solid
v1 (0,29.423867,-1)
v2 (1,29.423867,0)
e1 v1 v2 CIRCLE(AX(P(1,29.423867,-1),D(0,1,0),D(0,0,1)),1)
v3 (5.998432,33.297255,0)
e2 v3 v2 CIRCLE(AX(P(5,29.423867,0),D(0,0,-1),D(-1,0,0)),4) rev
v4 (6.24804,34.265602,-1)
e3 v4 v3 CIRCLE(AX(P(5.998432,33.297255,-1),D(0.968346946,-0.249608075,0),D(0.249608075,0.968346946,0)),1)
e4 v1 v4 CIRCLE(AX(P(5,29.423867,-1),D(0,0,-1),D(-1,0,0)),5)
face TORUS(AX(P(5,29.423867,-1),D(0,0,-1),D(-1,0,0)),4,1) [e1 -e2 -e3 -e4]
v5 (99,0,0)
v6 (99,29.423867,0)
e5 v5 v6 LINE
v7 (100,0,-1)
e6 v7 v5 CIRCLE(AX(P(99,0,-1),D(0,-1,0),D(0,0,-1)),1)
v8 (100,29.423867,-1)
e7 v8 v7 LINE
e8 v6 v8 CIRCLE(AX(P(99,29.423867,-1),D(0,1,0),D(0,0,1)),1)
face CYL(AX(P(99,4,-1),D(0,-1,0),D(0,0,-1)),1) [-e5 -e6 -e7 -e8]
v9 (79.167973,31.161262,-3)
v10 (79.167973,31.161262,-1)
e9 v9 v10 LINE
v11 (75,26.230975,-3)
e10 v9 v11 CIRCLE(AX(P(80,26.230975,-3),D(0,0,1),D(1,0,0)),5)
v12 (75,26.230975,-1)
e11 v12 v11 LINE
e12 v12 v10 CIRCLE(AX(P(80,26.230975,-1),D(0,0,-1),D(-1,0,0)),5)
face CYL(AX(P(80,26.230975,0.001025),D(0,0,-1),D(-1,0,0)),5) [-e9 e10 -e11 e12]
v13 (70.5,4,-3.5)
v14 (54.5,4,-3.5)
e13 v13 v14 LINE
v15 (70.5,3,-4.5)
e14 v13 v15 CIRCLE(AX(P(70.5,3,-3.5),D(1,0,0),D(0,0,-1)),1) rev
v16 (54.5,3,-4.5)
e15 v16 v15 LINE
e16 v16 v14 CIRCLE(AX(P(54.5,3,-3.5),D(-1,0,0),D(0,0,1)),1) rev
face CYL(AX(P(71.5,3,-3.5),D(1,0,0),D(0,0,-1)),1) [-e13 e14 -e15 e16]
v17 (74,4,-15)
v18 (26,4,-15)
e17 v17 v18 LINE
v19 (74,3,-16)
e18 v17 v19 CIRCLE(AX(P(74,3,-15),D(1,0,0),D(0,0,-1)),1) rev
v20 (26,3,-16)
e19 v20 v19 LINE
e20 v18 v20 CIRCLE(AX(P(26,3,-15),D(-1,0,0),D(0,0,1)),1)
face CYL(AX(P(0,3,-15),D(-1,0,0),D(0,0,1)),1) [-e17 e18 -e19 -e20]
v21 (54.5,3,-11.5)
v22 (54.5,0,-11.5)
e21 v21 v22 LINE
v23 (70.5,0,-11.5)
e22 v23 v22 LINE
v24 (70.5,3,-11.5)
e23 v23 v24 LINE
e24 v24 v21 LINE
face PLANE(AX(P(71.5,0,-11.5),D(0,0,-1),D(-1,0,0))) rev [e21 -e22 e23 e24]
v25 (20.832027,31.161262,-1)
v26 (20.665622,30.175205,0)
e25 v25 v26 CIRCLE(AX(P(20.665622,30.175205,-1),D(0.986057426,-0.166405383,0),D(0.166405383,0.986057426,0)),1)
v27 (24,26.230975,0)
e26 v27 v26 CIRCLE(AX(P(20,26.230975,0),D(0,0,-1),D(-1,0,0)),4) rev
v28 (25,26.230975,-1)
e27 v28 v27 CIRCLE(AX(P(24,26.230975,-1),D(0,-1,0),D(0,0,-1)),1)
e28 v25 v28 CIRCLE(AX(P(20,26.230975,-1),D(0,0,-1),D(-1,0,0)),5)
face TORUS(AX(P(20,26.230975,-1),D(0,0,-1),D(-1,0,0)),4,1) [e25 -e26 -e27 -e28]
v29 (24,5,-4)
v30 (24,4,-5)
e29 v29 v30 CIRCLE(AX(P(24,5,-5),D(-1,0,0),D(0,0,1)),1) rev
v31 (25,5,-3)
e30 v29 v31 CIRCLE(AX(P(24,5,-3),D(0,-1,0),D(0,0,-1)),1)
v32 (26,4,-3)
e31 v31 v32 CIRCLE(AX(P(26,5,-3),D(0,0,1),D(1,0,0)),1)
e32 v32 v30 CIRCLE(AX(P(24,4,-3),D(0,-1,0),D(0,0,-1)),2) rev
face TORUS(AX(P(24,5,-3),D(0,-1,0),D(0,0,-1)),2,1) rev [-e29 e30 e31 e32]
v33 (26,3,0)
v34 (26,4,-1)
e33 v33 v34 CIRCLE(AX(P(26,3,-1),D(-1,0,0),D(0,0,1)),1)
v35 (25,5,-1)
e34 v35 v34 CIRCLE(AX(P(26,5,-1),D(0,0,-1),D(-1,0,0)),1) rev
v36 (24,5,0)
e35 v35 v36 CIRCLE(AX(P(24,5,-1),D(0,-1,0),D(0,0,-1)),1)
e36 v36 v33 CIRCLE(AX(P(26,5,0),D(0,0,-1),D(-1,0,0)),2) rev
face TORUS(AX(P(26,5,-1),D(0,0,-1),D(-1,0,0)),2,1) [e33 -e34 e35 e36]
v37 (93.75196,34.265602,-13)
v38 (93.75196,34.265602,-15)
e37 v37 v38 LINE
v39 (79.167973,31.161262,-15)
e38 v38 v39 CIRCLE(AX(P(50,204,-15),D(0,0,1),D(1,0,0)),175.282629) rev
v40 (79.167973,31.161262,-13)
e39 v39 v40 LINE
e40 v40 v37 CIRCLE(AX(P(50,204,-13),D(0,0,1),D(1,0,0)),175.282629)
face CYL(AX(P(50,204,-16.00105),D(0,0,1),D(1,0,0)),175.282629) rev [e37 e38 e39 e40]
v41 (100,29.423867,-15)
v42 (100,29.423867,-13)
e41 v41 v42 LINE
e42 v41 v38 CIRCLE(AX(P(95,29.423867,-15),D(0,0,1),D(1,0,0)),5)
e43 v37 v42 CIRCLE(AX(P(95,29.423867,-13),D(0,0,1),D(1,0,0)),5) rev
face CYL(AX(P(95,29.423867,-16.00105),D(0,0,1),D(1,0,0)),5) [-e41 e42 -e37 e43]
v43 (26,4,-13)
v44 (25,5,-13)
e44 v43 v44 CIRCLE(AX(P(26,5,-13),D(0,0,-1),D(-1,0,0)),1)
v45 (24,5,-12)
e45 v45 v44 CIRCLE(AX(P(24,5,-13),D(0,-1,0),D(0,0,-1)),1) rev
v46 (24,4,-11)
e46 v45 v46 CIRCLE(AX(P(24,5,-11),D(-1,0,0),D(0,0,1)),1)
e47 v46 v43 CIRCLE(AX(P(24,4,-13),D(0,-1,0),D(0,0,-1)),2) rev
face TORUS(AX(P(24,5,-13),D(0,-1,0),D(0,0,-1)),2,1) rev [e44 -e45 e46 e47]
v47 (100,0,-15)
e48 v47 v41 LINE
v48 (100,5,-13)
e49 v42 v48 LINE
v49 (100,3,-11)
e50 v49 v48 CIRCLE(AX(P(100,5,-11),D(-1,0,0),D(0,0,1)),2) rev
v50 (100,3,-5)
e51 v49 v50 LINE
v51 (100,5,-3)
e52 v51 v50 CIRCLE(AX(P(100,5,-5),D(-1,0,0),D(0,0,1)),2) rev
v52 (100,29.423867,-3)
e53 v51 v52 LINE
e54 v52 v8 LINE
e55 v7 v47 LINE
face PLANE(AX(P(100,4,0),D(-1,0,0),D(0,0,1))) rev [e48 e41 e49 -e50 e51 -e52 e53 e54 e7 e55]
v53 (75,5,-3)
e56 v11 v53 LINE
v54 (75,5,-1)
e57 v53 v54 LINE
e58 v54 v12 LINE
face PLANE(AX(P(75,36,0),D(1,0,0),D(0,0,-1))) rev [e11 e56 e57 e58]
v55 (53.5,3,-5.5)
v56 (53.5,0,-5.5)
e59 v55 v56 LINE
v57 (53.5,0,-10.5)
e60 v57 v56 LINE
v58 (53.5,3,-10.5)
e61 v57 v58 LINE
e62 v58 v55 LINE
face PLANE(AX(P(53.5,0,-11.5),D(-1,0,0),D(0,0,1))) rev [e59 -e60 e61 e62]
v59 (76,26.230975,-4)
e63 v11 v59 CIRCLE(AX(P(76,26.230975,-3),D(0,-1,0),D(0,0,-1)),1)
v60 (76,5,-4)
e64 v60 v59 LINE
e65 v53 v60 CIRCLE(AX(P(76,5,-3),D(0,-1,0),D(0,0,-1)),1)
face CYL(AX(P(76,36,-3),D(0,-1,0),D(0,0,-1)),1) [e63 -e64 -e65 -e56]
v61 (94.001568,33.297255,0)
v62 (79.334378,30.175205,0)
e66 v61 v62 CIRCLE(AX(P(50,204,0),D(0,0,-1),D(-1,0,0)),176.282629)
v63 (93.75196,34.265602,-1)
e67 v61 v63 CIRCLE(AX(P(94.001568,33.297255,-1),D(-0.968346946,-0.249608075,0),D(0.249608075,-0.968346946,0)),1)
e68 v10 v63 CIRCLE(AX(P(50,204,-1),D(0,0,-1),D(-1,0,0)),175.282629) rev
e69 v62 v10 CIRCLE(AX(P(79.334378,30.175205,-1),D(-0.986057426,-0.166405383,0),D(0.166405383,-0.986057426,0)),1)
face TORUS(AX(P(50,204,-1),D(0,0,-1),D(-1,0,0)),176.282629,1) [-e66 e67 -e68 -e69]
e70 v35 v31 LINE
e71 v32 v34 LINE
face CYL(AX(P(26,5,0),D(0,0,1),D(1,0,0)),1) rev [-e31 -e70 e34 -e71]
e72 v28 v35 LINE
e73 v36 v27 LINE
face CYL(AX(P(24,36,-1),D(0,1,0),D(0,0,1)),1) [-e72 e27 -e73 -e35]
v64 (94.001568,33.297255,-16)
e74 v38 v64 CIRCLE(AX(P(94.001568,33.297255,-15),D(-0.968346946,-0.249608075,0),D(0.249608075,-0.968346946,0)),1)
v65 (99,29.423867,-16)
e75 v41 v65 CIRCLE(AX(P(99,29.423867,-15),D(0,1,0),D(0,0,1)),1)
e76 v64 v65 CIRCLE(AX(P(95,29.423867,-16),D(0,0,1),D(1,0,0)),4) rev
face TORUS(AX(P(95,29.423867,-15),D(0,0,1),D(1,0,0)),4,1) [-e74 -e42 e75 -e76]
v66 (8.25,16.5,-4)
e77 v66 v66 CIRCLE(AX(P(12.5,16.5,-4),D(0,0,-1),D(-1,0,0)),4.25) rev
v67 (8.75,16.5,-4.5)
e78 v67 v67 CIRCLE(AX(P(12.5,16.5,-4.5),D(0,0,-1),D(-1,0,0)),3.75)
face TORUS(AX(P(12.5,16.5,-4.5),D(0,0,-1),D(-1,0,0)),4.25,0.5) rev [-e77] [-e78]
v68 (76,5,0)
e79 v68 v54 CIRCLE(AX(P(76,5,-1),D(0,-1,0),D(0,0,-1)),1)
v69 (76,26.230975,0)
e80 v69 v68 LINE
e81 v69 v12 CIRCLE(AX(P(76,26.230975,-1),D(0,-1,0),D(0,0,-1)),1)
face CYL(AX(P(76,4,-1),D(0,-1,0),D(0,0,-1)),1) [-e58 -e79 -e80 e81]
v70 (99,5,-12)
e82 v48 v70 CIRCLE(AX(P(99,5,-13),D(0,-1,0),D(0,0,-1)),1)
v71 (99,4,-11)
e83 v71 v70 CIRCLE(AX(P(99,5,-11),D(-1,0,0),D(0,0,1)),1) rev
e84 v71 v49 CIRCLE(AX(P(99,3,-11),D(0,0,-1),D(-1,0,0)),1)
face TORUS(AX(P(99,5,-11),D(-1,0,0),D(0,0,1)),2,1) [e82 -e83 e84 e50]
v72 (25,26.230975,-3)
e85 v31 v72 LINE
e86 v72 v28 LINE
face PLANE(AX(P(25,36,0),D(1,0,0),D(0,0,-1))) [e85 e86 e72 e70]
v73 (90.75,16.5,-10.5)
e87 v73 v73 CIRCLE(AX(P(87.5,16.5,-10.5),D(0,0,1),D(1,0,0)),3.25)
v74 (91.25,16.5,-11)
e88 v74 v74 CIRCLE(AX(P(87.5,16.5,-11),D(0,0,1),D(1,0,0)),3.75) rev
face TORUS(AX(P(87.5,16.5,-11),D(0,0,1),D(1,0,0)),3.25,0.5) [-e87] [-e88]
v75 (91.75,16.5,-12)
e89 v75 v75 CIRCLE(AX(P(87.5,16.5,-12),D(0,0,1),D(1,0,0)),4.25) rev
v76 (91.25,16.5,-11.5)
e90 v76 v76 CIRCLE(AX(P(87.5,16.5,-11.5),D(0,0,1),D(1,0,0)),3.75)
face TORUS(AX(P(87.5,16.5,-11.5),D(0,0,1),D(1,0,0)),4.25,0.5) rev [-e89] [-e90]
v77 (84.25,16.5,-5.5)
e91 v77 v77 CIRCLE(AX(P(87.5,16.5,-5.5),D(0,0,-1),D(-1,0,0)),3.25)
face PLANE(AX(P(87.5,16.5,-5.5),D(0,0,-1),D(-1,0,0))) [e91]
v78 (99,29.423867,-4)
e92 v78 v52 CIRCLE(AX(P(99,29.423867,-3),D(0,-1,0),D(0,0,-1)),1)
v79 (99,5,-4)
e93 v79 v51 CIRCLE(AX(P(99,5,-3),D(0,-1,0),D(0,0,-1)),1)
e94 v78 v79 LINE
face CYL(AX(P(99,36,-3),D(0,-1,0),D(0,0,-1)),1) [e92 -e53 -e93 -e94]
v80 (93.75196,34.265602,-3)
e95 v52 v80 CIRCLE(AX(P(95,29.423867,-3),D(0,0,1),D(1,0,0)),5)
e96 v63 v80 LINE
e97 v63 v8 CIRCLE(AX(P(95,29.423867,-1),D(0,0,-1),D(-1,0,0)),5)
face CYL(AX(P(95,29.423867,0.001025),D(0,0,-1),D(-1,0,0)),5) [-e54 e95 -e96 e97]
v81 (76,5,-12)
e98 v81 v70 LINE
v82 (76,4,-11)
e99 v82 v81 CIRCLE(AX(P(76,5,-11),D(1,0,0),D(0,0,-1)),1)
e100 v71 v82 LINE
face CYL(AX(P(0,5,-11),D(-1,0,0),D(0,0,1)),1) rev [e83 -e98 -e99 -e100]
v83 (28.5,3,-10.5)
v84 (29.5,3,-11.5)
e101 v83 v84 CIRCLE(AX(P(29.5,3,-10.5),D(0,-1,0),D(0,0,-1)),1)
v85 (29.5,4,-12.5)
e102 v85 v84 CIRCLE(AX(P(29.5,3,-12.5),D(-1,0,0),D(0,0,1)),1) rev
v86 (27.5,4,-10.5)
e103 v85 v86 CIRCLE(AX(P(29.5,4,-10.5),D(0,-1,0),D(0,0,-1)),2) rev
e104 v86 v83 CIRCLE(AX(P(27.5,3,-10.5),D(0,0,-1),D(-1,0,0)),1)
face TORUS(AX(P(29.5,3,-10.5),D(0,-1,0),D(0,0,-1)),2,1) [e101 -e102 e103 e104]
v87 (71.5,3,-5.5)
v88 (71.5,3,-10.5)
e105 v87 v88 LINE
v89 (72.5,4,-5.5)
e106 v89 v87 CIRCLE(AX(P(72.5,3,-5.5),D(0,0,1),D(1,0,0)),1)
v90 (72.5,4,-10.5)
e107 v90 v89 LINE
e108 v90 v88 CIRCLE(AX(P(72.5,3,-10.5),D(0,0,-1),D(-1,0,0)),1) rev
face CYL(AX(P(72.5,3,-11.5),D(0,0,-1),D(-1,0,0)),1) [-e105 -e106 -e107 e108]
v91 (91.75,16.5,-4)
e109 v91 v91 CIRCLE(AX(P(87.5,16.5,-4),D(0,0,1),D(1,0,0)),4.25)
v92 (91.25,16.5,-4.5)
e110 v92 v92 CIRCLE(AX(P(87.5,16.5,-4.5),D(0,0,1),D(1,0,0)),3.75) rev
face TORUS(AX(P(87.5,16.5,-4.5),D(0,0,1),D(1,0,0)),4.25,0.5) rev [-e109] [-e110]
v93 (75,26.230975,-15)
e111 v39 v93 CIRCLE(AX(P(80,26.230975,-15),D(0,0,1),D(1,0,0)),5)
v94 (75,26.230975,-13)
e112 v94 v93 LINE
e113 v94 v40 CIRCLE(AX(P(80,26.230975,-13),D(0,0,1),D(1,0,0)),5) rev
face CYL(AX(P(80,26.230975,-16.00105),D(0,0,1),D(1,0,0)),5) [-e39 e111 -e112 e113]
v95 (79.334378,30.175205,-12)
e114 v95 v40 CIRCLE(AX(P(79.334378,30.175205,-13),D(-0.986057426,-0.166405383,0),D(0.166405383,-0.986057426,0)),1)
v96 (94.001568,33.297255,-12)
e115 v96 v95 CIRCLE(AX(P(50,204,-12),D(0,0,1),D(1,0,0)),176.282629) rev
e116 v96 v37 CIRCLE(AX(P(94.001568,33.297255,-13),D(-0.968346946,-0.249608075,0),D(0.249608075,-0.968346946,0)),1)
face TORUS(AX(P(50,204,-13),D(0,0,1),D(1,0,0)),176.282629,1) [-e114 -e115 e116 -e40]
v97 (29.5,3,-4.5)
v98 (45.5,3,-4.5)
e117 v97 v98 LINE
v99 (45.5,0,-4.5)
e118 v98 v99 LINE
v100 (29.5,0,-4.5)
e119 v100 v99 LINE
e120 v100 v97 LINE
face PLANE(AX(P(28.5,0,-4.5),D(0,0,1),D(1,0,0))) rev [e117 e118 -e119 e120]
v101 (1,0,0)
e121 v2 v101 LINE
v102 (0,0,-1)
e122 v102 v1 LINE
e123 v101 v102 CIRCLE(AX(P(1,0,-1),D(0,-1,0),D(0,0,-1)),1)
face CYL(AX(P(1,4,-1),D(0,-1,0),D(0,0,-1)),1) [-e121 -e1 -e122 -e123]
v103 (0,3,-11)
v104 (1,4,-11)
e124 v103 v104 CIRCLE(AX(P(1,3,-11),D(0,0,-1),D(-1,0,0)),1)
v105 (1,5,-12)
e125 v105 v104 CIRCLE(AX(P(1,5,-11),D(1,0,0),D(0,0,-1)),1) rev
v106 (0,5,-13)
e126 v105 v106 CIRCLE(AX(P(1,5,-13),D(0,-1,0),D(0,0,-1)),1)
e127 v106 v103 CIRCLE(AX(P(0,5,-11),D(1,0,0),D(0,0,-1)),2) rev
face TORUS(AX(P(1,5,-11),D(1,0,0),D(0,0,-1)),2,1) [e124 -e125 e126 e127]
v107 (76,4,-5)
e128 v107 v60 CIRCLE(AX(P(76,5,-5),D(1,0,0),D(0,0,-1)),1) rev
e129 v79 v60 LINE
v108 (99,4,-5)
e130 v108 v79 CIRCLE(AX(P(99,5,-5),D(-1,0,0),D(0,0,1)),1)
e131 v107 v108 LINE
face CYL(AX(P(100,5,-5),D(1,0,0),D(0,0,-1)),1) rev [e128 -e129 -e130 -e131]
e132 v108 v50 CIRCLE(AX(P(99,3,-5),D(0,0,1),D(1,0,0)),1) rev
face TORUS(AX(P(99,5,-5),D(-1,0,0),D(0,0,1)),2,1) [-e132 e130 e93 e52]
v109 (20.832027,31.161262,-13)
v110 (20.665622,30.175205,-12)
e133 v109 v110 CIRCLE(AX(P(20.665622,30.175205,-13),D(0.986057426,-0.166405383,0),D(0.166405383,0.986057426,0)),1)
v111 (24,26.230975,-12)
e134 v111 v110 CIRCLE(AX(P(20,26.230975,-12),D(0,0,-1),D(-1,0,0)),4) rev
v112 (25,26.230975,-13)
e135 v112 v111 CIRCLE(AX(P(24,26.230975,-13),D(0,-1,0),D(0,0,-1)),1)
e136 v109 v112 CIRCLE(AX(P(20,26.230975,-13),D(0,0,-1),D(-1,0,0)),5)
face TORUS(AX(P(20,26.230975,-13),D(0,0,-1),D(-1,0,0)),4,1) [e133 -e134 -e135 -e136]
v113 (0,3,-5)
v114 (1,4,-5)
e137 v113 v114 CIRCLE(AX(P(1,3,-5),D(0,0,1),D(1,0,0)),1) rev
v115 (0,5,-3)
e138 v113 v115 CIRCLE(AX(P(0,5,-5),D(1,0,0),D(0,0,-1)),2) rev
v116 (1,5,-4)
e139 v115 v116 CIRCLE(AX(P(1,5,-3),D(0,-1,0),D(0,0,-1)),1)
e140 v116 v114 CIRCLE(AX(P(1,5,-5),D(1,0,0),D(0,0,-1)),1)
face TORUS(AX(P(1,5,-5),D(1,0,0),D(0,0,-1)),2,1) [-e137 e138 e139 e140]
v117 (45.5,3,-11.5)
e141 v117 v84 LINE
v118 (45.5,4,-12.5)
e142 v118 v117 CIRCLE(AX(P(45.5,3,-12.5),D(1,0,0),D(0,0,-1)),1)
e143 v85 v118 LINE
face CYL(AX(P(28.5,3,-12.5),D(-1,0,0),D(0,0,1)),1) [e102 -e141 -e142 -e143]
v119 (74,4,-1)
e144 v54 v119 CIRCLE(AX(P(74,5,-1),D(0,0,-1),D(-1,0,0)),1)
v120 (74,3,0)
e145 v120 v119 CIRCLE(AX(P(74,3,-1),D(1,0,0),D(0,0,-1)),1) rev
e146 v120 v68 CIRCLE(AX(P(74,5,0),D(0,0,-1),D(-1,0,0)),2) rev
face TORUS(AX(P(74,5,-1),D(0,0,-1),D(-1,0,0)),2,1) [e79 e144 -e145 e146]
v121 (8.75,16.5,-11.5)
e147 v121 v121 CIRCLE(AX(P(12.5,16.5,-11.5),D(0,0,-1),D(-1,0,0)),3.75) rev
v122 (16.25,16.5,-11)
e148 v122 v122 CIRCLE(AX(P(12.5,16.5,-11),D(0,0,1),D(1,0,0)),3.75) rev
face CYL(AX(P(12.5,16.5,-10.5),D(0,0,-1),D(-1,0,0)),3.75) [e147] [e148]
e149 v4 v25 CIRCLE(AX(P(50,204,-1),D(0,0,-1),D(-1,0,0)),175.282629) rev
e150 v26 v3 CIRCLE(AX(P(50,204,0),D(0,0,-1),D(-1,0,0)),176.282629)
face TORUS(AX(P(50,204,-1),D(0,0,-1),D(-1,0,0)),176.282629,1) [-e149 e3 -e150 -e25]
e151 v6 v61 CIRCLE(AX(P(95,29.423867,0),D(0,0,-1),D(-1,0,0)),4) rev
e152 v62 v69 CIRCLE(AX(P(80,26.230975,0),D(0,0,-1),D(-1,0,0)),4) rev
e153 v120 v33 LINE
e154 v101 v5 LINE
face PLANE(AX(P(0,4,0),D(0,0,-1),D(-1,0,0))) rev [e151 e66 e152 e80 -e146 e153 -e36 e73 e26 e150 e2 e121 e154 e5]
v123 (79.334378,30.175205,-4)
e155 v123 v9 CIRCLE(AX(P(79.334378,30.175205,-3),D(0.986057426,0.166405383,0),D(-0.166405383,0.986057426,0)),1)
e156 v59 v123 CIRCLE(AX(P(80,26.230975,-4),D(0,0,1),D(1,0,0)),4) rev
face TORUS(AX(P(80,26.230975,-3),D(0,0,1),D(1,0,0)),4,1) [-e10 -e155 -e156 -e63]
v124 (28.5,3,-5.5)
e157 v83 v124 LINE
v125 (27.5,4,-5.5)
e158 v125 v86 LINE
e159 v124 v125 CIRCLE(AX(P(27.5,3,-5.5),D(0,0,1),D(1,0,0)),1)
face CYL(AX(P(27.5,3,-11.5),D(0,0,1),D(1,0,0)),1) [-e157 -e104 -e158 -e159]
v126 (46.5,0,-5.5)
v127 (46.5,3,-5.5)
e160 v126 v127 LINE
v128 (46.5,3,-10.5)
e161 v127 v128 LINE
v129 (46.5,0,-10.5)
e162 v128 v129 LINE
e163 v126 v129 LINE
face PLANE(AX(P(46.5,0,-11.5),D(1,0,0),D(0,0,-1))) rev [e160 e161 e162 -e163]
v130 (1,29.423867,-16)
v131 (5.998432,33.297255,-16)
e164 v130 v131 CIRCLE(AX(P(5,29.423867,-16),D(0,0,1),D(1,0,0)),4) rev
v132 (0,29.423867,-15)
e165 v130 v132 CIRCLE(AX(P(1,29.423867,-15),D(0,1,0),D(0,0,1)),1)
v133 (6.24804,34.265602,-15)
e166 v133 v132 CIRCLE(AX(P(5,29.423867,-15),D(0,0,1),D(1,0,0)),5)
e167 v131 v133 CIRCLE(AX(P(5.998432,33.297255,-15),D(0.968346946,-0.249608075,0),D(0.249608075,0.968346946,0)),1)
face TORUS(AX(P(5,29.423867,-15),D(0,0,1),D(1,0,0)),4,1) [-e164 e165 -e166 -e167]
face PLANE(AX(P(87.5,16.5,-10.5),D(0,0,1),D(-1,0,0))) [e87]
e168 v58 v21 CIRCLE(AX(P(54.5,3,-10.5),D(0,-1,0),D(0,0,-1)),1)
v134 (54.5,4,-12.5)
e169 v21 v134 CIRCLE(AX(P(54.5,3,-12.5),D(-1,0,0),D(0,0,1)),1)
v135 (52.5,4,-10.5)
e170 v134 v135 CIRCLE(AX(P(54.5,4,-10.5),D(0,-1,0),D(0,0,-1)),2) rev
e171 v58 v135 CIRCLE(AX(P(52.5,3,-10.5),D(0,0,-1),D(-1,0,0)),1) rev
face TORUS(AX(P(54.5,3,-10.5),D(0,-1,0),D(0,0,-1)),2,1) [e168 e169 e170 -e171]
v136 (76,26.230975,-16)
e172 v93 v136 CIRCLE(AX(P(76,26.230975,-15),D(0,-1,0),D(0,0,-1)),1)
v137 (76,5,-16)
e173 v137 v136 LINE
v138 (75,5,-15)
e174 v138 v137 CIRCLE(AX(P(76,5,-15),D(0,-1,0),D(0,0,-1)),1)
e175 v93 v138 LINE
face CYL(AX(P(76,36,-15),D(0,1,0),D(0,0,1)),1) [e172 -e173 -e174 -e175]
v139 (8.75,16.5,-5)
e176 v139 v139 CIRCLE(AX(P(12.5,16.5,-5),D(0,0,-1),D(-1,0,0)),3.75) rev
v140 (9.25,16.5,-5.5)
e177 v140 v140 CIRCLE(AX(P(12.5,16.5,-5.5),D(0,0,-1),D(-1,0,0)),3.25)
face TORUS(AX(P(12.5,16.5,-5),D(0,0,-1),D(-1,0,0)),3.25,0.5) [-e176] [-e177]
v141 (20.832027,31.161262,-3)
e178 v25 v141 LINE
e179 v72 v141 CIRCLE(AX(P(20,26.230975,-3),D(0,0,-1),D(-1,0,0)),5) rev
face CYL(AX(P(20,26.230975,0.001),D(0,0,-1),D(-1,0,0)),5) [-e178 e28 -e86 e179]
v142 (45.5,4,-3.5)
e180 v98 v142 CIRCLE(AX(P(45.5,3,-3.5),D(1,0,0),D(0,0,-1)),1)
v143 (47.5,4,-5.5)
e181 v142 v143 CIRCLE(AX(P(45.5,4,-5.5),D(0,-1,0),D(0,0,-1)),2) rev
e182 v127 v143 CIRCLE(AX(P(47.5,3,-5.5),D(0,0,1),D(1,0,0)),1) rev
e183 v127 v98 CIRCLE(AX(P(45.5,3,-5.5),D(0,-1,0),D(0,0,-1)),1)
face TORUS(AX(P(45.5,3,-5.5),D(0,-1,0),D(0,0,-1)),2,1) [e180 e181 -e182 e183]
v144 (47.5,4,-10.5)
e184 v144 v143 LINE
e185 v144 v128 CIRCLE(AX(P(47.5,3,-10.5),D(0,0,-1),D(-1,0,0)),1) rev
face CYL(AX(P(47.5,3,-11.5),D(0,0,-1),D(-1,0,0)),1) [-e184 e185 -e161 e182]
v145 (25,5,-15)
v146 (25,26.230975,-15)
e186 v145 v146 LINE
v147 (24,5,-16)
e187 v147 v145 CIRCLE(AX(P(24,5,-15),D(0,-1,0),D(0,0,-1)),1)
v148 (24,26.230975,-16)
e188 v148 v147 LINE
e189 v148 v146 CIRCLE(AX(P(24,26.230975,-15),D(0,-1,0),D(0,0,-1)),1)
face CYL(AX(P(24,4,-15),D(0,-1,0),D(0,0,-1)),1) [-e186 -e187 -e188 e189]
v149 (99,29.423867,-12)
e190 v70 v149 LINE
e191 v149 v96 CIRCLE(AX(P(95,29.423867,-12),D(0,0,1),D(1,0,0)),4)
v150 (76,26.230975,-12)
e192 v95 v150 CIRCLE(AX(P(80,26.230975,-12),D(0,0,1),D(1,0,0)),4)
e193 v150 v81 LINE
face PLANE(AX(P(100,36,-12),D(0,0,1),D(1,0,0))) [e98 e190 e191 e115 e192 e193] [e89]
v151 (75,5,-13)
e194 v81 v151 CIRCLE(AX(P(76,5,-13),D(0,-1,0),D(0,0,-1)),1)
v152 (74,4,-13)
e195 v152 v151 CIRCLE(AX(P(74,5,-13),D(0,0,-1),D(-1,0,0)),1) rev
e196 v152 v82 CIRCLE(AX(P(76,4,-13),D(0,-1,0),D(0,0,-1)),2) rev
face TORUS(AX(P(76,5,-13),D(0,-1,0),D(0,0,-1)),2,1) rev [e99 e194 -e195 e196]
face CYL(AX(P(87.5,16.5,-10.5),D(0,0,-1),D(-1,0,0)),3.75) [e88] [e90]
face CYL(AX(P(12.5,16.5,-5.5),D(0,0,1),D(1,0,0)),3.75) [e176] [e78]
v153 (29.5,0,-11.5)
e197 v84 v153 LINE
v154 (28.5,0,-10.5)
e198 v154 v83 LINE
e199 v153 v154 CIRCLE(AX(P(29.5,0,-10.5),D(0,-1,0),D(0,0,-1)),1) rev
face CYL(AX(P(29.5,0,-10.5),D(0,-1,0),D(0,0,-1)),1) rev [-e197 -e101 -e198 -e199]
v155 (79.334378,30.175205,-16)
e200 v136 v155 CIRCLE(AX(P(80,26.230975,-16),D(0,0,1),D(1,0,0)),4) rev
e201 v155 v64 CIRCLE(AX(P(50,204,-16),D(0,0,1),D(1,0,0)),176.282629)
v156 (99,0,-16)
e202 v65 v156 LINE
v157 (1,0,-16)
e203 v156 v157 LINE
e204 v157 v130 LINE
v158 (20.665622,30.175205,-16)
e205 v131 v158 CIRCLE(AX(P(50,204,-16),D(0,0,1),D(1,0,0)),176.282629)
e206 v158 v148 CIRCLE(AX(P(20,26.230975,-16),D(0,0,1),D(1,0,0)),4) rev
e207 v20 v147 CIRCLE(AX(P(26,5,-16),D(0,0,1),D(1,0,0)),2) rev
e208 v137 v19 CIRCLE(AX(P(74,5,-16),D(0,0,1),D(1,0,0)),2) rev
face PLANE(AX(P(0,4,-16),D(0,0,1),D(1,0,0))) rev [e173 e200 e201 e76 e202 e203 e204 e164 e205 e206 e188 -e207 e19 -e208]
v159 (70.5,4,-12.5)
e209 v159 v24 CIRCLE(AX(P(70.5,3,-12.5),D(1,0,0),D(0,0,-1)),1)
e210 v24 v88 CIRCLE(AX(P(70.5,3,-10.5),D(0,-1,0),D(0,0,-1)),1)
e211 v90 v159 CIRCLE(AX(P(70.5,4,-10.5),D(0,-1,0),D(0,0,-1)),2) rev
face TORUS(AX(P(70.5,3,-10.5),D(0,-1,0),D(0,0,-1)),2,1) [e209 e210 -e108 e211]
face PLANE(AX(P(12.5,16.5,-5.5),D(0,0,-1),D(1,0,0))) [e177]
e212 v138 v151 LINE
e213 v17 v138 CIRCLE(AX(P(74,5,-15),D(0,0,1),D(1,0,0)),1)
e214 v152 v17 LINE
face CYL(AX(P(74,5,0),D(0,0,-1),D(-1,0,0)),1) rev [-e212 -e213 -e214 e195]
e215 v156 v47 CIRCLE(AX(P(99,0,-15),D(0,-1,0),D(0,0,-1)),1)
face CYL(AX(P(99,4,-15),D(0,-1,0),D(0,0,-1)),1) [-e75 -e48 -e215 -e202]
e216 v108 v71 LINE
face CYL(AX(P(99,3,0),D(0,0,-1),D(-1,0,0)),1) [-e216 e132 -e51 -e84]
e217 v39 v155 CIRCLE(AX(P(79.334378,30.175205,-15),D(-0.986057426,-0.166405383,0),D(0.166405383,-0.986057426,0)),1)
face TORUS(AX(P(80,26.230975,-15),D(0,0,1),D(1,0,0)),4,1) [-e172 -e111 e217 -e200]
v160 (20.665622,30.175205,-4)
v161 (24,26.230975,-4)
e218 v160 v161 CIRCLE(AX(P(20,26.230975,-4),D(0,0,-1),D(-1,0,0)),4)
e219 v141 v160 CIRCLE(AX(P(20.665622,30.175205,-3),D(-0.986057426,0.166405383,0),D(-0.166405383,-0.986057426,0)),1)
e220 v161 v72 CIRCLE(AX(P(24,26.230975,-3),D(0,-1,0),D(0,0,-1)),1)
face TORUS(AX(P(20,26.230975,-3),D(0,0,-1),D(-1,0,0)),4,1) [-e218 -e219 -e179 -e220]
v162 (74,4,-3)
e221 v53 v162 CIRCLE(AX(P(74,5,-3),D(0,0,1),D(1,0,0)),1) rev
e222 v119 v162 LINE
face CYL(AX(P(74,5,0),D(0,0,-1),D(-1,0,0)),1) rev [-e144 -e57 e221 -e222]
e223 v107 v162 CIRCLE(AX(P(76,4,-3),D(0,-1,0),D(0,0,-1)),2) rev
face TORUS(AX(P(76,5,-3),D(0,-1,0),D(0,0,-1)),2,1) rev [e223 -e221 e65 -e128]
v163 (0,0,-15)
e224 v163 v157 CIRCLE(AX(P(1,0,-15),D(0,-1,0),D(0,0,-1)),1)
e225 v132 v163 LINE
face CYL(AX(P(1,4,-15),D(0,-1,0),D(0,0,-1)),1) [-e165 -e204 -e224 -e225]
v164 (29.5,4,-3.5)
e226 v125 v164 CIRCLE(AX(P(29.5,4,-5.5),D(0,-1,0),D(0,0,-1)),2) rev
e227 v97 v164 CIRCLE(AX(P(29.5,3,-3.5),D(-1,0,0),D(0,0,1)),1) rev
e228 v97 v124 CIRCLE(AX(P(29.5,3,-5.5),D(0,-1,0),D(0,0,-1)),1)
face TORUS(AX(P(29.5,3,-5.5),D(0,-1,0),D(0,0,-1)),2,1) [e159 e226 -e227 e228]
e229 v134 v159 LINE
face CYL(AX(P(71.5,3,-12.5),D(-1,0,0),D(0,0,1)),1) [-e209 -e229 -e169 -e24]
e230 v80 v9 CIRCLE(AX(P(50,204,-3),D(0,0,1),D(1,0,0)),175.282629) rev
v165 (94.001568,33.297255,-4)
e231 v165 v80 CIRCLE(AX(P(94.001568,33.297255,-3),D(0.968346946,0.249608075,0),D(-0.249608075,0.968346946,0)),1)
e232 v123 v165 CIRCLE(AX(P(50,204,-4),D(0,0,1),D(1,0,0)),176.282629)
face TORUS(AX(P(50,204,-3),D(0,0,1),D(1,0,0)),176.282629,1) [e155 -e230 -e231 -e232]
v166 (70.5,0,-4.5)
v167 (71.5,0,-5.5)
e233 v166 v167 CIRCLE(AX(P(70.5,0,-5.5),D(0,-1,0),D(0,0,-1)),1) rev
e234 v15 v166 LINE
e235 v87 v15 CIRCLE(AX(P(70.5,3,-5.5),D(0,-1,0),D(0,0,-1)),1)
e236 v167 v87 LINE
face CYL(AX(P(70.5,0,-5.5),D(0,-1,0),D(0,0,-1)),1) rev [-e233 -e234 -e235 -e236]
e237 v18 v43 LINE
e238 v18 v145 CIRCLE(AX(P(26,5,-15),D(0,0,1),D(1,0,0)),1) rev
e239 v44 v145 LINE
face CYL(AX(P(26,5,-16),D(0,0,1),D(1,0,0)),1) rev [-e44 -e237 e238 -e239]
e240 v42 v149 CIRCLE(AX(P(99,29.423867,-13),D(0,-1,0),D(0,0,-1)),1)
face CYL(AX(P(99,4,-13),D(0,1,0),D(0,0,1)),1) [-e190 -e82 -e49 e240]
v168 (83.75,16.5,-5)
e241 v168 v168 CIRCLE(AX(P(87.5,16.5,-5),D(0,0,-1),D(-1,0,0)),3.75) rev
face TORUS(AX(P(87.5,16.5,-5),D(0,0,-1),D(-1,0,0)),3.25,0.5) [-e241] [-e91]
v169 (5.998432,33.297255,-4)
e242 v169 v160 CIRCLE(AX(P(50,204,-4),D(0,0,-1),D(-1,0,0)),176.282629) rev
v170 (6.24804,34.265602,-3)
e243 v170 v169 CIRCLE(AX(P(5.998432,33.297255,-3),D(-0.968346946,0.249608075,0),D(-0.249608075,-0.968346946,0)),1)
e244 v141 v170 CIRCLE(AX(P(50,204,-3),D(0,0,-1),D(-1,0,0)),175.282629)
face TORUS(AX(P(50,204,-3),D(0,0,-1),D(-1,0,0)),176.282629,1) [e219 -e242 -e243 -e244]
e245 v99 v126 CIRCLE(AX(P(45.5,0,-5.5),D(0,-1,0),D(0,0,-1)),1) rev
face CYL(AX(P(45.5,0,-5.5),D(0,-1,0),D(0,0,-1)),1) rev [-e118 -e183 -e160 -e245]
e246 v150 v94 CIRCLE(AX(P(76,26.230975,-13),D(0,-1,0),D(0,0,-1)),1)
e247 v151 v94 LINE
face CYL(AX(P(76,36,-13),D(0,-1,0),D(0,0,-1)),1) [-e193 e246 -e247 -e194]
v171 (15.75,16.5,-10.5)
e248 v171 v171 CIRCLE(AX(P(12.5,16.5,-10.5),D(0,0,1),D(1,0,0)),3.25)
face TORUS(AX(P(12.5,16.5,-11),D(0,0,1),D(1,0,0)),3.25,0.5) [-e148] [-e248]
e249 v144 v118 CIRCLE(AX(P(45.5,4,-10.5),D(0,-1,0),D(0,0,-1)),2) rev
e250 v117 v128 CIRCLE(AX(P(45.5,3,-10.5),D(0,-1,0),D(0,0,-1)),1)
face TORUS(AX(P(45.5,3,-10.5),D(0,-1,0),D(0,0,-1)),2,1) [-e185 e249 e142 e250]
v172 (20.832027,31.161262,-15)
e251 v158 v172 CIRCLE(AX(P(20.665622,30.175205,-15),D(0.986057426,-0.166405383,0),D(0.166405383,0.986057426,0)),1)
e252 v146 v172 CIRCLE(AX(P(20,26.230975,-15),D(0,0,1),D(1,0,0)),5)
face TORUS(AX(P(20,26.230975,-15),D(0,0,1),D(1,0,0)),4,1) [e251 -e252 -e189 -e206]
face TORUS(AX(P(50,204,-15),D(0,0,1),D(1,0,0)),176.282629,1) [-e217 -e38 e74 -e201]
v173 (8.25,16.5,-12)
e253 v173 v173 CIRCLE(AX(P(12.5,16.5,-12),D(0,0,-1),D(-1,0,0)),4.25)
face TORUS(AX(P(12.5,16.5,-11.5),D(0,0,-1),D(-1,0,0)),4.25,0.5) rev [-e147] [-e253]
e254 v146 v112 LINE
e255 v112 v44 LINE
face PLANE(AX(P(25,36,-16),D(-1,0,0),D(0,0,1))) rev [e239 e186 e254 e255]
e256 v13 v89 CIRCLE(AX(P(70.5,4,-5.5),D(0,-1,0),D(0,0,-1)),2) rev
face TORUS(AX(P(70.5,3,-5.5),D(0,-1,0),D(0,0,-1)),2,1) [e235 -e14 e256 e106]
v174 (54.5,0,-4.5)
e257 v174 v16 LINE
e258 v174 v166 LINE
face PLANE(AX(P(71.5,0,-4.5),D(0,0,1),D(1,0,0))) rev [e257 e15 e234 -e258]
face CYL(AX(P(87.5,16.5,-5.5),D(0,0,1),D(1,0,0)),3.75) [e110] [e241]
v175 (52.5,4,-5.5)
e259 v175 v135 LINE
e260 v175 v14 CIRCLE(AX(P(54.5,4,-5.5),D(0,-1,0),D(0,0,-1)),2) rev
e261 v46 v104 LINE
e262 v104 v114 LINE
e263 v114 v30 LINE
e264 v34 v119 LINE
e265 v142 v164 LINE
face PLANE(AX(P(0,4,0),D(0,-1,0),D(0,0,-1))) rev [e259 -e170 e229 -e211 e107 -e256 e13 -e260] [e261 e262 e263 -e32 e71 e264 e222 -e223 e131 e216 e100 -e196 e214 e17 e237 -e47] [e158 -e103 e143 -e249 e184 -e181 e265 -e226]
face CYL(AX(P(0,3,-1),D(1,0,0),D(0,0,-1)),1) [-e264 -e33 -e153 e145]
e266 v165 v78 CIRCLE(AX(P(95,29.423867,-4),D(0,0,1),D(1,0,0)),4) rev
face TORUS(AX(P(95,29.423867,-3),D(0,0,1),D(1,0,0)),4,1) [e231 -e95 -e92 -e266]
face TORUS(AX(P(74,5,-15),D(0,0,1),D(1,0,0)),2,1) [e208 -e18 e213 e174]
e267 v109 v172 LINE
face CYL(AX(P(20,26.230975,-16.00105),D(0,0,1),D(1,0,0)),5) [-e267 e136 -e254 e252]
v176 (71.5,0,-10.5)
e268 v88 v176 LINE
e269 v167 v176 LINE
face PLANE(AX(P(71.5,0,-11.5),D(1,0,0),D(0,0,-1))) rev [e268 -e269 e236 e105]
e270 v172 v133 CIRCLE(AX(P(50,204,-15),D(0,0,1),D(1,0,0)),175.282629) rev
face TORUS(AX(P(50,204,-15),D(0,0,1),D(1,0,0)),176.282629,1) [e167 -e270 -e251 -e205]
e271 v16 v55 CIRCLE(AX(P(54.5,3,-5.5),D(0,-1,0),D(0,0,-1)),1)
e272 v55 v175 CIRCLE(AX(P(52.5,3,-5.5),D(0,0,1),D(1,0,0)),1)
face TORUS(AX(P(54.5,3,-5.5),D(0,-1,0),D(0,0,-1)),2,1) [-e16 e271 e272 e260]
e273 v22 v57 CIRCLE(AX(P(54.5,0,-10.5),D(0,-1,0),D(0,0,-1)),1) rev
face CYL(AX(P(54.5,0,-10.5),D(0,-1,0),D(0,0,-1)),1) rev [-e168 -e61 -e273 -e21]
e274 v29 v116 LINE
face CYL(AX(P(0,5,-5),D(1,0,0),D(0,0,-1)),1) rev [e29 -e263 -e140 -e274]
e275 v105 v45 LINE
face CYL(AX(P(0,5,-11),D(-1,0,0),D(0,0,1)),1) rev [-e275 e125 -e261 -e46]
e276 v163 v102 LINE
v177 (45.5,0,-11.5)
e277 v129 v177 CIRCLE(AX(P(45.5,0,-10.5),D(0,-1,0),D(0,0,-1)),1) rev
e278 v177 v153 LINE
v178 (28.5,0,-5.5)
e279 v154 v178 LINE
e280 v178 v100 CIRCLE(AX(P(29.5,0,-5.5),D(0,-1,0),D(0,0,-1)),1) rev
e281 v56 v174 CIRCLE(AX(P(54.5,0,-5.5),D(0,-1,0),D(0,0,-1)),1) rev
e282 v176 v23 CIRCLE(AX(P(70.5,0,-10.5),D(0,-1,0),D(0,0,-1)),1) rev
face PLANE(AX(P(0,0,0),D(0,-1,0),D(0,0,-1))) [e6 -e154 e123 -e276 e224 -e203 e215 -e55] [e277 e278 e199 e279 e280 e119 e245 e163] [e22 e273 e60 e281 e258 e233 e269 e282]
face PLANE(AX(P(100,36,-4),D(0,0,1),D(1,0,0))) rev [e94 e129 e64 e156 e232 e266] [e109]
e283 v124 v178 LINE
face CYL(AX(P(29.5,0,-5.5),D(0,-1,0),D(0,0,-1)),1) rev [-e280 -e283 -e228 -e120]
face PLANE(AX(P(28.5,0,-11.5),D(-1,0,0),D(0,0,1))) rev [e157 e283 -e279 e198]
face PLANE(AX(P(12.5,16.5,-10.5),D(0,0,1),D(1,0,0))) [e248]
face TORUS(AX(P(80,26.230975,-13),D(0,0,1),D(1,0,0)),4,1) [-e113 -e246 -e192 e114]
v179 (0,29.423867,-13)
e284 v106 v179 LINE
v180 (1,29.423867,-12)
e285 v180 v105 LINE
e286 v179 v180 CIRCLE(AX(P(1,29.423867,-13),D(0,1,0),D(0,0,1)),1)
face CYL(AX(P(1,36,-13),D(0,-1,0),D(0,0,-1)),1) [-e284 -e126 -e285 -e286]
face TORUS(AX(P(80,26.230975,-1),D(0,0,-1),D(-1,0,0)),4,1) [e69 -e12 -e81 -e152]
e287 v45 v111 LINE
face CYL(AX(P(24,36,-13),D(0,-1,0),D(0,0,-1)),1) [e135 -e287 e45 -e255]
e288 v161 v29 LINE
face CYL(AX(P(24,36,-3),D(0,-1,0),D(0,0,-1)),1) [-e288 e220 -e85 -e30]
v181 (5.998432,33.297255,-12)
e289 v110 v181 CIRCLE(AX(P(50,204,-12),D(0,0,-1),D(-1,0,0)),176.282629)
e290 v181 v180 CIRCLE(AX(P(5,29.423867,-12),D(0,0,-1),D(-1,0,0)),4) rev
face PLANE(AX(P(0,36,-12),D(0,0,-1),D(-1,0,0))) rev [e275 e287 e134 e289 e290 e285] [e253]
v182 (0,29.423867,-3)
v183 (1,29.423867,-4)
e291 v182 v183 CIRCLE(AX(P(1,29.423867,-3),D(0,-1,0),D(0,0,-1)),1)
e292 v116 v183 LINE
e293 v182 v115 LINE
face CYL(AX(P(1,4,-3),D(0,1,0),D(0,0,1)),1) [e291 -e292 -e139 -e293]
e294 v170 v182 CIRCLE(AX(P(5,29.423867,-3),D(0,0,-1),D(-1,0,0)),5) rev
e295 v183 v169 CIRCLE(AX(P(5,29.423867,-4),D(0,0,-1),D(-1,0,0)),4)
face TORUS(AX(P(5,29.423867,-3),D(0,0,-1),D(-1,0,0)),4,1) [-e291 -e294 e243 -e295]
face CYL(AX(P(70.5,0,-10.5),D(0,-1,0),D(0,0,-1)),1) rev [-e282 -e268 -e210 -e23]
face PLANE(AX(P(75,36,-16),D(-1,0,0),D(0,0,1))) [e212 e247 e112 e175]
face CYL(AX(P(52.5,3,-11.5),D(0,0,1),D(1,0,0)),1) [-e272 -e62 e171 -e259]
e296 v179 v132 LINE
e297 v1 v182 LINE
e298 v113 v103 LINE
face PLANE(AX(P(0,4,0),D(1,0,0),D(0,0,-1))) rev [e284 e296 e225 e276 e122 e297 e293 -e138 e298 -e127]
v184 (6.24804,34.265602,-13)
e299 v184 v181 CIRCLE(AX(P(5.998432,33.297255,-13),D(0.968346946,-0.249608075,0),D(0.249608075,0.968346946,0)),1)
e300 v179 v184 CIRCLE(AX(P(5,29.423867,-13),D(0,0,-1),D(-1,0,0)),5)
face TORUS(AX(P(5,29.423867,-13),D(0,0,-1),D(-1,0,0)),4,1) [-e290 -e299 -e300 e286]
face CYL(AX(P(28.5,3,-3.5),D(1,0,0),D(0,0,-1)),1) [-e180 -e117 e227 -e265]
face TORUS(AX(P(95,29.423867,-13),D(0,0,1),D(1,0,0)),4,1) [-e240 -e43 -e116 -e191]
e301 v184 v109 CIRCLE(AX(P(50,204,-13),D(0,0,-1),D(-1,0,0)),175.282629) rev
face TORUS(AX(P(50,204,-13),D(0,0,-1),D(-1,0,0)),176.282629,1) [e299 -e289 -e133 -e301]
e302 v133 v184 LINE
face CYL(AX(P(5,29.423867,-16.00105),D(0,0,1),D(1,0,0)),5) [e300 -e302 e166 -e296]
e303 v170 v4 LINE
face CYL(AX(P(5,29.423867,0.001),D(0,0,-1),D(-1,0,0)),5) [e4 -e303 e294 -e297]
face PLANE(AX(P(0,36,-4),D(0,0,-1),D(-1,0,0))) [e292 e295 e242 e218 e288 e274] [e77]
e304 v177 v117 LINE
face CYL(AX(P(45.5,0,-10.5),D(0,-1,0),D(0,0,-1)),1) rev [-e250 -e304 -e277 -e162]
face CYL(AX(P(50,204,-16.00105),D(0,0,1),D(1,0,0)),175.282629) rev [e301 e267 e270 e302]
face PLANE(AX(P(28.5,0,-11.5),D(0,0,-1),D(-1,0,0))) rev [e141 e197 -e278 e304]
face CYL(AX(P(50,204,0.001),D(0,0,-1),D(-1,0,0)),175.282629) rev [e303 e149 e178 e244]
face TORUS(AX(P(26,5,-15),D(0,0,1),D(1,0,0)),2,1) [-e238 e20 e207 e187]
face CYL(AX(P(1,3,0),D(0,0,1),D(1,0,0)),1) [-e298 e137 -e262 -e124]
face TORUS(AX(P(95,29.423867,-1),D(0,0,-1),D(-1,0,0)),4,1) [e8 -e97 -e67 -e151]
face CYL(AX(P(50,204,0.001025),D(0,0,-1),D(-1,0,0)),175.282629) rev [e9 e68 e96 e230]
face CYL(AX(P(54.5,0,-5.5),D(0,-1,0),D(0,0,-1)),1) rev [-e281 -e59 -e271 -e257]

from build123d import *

# Parameters (mm, degrees)
SKETCH1_W            = 100
SKETCH1_H            = 16
BOSS_EXTRUDE1_DEPTH  = 4
SKETCH2_W            = 25
SKETCH2_H            = 4
BOSS_EXTRUDE2_DEPTH  = 32
SKETCH3_R            = 3.75
BOSS_EXTRUDE3_DEPTH  = 1.5
FILLET1_R            = 0.5
CUT_EXTRUDE1_REACH   = 108.958
SKETCH4_R            = 175.282628917
FILLET1_OF_MIRROR3_R = 0.5
FILLET2_R            = 5
SKETCH5_W            = 18
SKETCH5_H            = 7
CUT_EXTRUDE2_DEPTH   = 106.743140061
FILLET5_R            = 1


# Read off the part's stored shape, not the designer's step: Mirror4
with BuildPart() as part:
    # Sketch1 → Boss-Extrude1 (new body)
    with BuildSketch(Plane(origin=(0, 0, 0), x_dir=(1, 0, 0), z_dir=(0, 1, 0))):
        with Locations((50, 8)):
            Rectangle(SKETCH1_W, SKETCH1_H)
    extrude(amount=BOSS_EXTRUDE1_DEPTH)

    # Sketch2 → Boss-Extrude2 (add)
    with BuildSketch(Plane(origin=(0, 4, 0), x_dir=(1, 0, 0), z_dir=(0, 1, 0))):
        with Locations((12.5, 14)):
            Rectangle(SKETCH2_W, SKETCH2_H)
    boss_extrude2 = extrude(amount=BOSS_EXTRUDE2_DEPTH)

    # Sketch3 → Boss-Extrude3 (add)
    with BuildSketch(Plane.XY.offset(-12)):
        with Locations(Location((12.5, 16.5, 0), (0, 0, 180))):
            Circle(SKETCH3_R)
    boss_extrude3 = extrude(amount=BOSS_EXTRUDE3_DEPTH)

    # Fillet1
    fillet1_edges = [part.edges().sort_by_distance(p)[0] for p in [
        (16.25, 16.5, -12),
        (16.25, 16.5, -10.5),
    ]]
    fillet(fillet1_edges, radius=FILLET1_R)

    # Sketch4 → Cut-Extrude1 (cut, up to next)
    with BuildSketch(Plane.XY.offset(-12), mode=Mode.PRIVATE) as cut_extrude1_sk1:
        with Locations((50, 204)):
            Circle(SKETCH4_R)
    cut_extrude1_tool1 = extrude(cut_extrude1_sk1.sketch, amount=-CUT_EXTRUDE1_REACH, mode=Mode.PRIVATE) & part.part
    cut_extrude1 = cut_extrude1_tool1.solids().sort_by_distance((50, 204, -12))[0]
    add(cut_extrude1, mode=Mode.SUBTRACT)

    # Mirror3: Boss-Extrude2, Boss-Extrude3, Cut-Extrude1 across plane
    add(boss_extrude2.mirror(Plane.ZY.offset(-50)))
    add(boss_extrude3.mirror(Plane.ZY.offset(-50)))
    add(cut_extrude1.mirror(Plane.ZY.offset(-50)), mode=Mode.SUBTRACT)

    # Fillet1 of Mirror3
    fillet1_of_mirror3_edges = [part.edges().sort_by_distance(p)[0] for p in [
        (83.75, 16.5, -12),
        (83.75, 16.5, -10.5),
    ]]
    fillet(fillet1_of_mirror3_edges, radius=FILLET1_OF_MIRROR3_R)

    # Mirror4: part across plane


with BuildPart() as part_1:
    add(part.part)
    add(part.part.mirror(Plane.XY.offset(-8)))

    # Fillet2
    fillet2_edges = [part_1.edges().sort_by_distance(p)[0] for p in [
        (25, 30.509366247, -14),
        (0, 36, -14),
        (75, 30.509366247, -14),
        (100, 36, -14),
        (100, 36, -2),
        (75, 30.509366247, -2),
        (25, 30.509366247, -2),
        (0, 36, -2),
    ]]
    fillet(fillet2_edges, radius=FILLET2_R)

    # Sketch5 → Cut-Extrude2 (cut, through all)
    with BuildSketch(Plane(origin=(0, 4, 0), x_dir=(1, 0, 0), z_dir=(0, 1, 0))):
        with Locations((37.5, 8)):
            Rectangle(SKETCH5_W, SKETCH5_H)
        with Locations((62.5, 8)):
            Rectangle(SKETCH5_W, SKETCH5_H)
    extrude(amount=-CUT_EXTRUDE2_DEPTH, mode=Mode.SUBTRACT)

    # Fillet5
    fillet5_edges = [part_1.edges().sort_by_distance(p)[0] for p in [
        (50, 4, 0),
        (12.5, 4, -4),
        (25, 4, -2),
        (0, 4, -8),
        (100, 14.711933391, -16),
        (100, 16.711933391, -12),
        (100, 16.711933391, -4),
        (100, 14.711933391, 0),
        (86.492990798, 32.558285057, -12),
        (75, 15.115487444, -12),
        (76.18161457, 29.458966943, -12),
        (98.062662087, 33.376094122, -12),
        (86.492990798, 32.558285057, -16),
        (0, 14.711933391, -16),
        (13.507009202, 32.558285057, -16),
        (25, 15.115487444, -16),
        (75, 15.115487444, -16),
        (1.937337913, 33.376094122, -16),
        (23.81838543, 29.458966943, -16),
        (76.18161457, 29.458966943, -16),
        (98.062662087, 33.376094122, -16),
        (86.492990798, 32.558285057, 0),
        (86.492990798, 32.558285057, -4),
        (75, 15.115487444, -4),
        (76.18161457, 29.458966943, -4),
        (98.062662087, 33.376094122, -4),
        (13.507009202, 32.558285057, 0),
        (0, 14.711933391, 0),
        (75, 15.115487444, 0),
        (25, 15.115487444, 0),
        (1.937337913, 33.376094122, 0),
        (23.81838543, 29.458966943, 0),
        (12.5, 4, -12),
        (76.18161457, 29.458966943, 0),
        (98.062662087, 33.376094122, 0),
        (13.507009202, 32.558285057, -4),
        (25, 4, -14),
        (0, 16.711933391, -4),
        (25, 15.115487444, -4),
        (1.937337913, 33.376094122, -4),
        (23.81838543, 29.458966943, -4),
        (0, 16.711933391, -12),
        (13.507009202, 32.558285057, -12),
        (25, 15.115487444, -12),
        (1.937337913, 33.376094122, -12),
        (23.81838543, 29.458966943, -12),
        (28.5, 2, -4.5),
        (28.5, 2, -11.5),
        (46.5, 2, -11.5),
        (46.5, 2, -4.5),
        (28.5, 4, -8),
        (37.5, 4, -4.5),
        (46.5, 4, -8),
        (37.5, 4, -11.5),
        (53.5, 2, -11.5),
        (71.5, 2, -11.5),
        (71.5, 2, -4.5),
        (53.5, 2, -4.5),
        (62.5, 4, -11.5),
        (53.5, 4, -8),
        (62.5, 4, -4.5),
        (71.5, 4, -8),
        (50, 4, -16),
        (87.5, 4, -12),
        (75, 4, -14),
        (100, 4, -8),
        (87.5, 4, -4),
        (75, 4, -2),
    ]]
    fillet(fillet5_edges, radius=FILLET5_R)


solid = part_1.part
